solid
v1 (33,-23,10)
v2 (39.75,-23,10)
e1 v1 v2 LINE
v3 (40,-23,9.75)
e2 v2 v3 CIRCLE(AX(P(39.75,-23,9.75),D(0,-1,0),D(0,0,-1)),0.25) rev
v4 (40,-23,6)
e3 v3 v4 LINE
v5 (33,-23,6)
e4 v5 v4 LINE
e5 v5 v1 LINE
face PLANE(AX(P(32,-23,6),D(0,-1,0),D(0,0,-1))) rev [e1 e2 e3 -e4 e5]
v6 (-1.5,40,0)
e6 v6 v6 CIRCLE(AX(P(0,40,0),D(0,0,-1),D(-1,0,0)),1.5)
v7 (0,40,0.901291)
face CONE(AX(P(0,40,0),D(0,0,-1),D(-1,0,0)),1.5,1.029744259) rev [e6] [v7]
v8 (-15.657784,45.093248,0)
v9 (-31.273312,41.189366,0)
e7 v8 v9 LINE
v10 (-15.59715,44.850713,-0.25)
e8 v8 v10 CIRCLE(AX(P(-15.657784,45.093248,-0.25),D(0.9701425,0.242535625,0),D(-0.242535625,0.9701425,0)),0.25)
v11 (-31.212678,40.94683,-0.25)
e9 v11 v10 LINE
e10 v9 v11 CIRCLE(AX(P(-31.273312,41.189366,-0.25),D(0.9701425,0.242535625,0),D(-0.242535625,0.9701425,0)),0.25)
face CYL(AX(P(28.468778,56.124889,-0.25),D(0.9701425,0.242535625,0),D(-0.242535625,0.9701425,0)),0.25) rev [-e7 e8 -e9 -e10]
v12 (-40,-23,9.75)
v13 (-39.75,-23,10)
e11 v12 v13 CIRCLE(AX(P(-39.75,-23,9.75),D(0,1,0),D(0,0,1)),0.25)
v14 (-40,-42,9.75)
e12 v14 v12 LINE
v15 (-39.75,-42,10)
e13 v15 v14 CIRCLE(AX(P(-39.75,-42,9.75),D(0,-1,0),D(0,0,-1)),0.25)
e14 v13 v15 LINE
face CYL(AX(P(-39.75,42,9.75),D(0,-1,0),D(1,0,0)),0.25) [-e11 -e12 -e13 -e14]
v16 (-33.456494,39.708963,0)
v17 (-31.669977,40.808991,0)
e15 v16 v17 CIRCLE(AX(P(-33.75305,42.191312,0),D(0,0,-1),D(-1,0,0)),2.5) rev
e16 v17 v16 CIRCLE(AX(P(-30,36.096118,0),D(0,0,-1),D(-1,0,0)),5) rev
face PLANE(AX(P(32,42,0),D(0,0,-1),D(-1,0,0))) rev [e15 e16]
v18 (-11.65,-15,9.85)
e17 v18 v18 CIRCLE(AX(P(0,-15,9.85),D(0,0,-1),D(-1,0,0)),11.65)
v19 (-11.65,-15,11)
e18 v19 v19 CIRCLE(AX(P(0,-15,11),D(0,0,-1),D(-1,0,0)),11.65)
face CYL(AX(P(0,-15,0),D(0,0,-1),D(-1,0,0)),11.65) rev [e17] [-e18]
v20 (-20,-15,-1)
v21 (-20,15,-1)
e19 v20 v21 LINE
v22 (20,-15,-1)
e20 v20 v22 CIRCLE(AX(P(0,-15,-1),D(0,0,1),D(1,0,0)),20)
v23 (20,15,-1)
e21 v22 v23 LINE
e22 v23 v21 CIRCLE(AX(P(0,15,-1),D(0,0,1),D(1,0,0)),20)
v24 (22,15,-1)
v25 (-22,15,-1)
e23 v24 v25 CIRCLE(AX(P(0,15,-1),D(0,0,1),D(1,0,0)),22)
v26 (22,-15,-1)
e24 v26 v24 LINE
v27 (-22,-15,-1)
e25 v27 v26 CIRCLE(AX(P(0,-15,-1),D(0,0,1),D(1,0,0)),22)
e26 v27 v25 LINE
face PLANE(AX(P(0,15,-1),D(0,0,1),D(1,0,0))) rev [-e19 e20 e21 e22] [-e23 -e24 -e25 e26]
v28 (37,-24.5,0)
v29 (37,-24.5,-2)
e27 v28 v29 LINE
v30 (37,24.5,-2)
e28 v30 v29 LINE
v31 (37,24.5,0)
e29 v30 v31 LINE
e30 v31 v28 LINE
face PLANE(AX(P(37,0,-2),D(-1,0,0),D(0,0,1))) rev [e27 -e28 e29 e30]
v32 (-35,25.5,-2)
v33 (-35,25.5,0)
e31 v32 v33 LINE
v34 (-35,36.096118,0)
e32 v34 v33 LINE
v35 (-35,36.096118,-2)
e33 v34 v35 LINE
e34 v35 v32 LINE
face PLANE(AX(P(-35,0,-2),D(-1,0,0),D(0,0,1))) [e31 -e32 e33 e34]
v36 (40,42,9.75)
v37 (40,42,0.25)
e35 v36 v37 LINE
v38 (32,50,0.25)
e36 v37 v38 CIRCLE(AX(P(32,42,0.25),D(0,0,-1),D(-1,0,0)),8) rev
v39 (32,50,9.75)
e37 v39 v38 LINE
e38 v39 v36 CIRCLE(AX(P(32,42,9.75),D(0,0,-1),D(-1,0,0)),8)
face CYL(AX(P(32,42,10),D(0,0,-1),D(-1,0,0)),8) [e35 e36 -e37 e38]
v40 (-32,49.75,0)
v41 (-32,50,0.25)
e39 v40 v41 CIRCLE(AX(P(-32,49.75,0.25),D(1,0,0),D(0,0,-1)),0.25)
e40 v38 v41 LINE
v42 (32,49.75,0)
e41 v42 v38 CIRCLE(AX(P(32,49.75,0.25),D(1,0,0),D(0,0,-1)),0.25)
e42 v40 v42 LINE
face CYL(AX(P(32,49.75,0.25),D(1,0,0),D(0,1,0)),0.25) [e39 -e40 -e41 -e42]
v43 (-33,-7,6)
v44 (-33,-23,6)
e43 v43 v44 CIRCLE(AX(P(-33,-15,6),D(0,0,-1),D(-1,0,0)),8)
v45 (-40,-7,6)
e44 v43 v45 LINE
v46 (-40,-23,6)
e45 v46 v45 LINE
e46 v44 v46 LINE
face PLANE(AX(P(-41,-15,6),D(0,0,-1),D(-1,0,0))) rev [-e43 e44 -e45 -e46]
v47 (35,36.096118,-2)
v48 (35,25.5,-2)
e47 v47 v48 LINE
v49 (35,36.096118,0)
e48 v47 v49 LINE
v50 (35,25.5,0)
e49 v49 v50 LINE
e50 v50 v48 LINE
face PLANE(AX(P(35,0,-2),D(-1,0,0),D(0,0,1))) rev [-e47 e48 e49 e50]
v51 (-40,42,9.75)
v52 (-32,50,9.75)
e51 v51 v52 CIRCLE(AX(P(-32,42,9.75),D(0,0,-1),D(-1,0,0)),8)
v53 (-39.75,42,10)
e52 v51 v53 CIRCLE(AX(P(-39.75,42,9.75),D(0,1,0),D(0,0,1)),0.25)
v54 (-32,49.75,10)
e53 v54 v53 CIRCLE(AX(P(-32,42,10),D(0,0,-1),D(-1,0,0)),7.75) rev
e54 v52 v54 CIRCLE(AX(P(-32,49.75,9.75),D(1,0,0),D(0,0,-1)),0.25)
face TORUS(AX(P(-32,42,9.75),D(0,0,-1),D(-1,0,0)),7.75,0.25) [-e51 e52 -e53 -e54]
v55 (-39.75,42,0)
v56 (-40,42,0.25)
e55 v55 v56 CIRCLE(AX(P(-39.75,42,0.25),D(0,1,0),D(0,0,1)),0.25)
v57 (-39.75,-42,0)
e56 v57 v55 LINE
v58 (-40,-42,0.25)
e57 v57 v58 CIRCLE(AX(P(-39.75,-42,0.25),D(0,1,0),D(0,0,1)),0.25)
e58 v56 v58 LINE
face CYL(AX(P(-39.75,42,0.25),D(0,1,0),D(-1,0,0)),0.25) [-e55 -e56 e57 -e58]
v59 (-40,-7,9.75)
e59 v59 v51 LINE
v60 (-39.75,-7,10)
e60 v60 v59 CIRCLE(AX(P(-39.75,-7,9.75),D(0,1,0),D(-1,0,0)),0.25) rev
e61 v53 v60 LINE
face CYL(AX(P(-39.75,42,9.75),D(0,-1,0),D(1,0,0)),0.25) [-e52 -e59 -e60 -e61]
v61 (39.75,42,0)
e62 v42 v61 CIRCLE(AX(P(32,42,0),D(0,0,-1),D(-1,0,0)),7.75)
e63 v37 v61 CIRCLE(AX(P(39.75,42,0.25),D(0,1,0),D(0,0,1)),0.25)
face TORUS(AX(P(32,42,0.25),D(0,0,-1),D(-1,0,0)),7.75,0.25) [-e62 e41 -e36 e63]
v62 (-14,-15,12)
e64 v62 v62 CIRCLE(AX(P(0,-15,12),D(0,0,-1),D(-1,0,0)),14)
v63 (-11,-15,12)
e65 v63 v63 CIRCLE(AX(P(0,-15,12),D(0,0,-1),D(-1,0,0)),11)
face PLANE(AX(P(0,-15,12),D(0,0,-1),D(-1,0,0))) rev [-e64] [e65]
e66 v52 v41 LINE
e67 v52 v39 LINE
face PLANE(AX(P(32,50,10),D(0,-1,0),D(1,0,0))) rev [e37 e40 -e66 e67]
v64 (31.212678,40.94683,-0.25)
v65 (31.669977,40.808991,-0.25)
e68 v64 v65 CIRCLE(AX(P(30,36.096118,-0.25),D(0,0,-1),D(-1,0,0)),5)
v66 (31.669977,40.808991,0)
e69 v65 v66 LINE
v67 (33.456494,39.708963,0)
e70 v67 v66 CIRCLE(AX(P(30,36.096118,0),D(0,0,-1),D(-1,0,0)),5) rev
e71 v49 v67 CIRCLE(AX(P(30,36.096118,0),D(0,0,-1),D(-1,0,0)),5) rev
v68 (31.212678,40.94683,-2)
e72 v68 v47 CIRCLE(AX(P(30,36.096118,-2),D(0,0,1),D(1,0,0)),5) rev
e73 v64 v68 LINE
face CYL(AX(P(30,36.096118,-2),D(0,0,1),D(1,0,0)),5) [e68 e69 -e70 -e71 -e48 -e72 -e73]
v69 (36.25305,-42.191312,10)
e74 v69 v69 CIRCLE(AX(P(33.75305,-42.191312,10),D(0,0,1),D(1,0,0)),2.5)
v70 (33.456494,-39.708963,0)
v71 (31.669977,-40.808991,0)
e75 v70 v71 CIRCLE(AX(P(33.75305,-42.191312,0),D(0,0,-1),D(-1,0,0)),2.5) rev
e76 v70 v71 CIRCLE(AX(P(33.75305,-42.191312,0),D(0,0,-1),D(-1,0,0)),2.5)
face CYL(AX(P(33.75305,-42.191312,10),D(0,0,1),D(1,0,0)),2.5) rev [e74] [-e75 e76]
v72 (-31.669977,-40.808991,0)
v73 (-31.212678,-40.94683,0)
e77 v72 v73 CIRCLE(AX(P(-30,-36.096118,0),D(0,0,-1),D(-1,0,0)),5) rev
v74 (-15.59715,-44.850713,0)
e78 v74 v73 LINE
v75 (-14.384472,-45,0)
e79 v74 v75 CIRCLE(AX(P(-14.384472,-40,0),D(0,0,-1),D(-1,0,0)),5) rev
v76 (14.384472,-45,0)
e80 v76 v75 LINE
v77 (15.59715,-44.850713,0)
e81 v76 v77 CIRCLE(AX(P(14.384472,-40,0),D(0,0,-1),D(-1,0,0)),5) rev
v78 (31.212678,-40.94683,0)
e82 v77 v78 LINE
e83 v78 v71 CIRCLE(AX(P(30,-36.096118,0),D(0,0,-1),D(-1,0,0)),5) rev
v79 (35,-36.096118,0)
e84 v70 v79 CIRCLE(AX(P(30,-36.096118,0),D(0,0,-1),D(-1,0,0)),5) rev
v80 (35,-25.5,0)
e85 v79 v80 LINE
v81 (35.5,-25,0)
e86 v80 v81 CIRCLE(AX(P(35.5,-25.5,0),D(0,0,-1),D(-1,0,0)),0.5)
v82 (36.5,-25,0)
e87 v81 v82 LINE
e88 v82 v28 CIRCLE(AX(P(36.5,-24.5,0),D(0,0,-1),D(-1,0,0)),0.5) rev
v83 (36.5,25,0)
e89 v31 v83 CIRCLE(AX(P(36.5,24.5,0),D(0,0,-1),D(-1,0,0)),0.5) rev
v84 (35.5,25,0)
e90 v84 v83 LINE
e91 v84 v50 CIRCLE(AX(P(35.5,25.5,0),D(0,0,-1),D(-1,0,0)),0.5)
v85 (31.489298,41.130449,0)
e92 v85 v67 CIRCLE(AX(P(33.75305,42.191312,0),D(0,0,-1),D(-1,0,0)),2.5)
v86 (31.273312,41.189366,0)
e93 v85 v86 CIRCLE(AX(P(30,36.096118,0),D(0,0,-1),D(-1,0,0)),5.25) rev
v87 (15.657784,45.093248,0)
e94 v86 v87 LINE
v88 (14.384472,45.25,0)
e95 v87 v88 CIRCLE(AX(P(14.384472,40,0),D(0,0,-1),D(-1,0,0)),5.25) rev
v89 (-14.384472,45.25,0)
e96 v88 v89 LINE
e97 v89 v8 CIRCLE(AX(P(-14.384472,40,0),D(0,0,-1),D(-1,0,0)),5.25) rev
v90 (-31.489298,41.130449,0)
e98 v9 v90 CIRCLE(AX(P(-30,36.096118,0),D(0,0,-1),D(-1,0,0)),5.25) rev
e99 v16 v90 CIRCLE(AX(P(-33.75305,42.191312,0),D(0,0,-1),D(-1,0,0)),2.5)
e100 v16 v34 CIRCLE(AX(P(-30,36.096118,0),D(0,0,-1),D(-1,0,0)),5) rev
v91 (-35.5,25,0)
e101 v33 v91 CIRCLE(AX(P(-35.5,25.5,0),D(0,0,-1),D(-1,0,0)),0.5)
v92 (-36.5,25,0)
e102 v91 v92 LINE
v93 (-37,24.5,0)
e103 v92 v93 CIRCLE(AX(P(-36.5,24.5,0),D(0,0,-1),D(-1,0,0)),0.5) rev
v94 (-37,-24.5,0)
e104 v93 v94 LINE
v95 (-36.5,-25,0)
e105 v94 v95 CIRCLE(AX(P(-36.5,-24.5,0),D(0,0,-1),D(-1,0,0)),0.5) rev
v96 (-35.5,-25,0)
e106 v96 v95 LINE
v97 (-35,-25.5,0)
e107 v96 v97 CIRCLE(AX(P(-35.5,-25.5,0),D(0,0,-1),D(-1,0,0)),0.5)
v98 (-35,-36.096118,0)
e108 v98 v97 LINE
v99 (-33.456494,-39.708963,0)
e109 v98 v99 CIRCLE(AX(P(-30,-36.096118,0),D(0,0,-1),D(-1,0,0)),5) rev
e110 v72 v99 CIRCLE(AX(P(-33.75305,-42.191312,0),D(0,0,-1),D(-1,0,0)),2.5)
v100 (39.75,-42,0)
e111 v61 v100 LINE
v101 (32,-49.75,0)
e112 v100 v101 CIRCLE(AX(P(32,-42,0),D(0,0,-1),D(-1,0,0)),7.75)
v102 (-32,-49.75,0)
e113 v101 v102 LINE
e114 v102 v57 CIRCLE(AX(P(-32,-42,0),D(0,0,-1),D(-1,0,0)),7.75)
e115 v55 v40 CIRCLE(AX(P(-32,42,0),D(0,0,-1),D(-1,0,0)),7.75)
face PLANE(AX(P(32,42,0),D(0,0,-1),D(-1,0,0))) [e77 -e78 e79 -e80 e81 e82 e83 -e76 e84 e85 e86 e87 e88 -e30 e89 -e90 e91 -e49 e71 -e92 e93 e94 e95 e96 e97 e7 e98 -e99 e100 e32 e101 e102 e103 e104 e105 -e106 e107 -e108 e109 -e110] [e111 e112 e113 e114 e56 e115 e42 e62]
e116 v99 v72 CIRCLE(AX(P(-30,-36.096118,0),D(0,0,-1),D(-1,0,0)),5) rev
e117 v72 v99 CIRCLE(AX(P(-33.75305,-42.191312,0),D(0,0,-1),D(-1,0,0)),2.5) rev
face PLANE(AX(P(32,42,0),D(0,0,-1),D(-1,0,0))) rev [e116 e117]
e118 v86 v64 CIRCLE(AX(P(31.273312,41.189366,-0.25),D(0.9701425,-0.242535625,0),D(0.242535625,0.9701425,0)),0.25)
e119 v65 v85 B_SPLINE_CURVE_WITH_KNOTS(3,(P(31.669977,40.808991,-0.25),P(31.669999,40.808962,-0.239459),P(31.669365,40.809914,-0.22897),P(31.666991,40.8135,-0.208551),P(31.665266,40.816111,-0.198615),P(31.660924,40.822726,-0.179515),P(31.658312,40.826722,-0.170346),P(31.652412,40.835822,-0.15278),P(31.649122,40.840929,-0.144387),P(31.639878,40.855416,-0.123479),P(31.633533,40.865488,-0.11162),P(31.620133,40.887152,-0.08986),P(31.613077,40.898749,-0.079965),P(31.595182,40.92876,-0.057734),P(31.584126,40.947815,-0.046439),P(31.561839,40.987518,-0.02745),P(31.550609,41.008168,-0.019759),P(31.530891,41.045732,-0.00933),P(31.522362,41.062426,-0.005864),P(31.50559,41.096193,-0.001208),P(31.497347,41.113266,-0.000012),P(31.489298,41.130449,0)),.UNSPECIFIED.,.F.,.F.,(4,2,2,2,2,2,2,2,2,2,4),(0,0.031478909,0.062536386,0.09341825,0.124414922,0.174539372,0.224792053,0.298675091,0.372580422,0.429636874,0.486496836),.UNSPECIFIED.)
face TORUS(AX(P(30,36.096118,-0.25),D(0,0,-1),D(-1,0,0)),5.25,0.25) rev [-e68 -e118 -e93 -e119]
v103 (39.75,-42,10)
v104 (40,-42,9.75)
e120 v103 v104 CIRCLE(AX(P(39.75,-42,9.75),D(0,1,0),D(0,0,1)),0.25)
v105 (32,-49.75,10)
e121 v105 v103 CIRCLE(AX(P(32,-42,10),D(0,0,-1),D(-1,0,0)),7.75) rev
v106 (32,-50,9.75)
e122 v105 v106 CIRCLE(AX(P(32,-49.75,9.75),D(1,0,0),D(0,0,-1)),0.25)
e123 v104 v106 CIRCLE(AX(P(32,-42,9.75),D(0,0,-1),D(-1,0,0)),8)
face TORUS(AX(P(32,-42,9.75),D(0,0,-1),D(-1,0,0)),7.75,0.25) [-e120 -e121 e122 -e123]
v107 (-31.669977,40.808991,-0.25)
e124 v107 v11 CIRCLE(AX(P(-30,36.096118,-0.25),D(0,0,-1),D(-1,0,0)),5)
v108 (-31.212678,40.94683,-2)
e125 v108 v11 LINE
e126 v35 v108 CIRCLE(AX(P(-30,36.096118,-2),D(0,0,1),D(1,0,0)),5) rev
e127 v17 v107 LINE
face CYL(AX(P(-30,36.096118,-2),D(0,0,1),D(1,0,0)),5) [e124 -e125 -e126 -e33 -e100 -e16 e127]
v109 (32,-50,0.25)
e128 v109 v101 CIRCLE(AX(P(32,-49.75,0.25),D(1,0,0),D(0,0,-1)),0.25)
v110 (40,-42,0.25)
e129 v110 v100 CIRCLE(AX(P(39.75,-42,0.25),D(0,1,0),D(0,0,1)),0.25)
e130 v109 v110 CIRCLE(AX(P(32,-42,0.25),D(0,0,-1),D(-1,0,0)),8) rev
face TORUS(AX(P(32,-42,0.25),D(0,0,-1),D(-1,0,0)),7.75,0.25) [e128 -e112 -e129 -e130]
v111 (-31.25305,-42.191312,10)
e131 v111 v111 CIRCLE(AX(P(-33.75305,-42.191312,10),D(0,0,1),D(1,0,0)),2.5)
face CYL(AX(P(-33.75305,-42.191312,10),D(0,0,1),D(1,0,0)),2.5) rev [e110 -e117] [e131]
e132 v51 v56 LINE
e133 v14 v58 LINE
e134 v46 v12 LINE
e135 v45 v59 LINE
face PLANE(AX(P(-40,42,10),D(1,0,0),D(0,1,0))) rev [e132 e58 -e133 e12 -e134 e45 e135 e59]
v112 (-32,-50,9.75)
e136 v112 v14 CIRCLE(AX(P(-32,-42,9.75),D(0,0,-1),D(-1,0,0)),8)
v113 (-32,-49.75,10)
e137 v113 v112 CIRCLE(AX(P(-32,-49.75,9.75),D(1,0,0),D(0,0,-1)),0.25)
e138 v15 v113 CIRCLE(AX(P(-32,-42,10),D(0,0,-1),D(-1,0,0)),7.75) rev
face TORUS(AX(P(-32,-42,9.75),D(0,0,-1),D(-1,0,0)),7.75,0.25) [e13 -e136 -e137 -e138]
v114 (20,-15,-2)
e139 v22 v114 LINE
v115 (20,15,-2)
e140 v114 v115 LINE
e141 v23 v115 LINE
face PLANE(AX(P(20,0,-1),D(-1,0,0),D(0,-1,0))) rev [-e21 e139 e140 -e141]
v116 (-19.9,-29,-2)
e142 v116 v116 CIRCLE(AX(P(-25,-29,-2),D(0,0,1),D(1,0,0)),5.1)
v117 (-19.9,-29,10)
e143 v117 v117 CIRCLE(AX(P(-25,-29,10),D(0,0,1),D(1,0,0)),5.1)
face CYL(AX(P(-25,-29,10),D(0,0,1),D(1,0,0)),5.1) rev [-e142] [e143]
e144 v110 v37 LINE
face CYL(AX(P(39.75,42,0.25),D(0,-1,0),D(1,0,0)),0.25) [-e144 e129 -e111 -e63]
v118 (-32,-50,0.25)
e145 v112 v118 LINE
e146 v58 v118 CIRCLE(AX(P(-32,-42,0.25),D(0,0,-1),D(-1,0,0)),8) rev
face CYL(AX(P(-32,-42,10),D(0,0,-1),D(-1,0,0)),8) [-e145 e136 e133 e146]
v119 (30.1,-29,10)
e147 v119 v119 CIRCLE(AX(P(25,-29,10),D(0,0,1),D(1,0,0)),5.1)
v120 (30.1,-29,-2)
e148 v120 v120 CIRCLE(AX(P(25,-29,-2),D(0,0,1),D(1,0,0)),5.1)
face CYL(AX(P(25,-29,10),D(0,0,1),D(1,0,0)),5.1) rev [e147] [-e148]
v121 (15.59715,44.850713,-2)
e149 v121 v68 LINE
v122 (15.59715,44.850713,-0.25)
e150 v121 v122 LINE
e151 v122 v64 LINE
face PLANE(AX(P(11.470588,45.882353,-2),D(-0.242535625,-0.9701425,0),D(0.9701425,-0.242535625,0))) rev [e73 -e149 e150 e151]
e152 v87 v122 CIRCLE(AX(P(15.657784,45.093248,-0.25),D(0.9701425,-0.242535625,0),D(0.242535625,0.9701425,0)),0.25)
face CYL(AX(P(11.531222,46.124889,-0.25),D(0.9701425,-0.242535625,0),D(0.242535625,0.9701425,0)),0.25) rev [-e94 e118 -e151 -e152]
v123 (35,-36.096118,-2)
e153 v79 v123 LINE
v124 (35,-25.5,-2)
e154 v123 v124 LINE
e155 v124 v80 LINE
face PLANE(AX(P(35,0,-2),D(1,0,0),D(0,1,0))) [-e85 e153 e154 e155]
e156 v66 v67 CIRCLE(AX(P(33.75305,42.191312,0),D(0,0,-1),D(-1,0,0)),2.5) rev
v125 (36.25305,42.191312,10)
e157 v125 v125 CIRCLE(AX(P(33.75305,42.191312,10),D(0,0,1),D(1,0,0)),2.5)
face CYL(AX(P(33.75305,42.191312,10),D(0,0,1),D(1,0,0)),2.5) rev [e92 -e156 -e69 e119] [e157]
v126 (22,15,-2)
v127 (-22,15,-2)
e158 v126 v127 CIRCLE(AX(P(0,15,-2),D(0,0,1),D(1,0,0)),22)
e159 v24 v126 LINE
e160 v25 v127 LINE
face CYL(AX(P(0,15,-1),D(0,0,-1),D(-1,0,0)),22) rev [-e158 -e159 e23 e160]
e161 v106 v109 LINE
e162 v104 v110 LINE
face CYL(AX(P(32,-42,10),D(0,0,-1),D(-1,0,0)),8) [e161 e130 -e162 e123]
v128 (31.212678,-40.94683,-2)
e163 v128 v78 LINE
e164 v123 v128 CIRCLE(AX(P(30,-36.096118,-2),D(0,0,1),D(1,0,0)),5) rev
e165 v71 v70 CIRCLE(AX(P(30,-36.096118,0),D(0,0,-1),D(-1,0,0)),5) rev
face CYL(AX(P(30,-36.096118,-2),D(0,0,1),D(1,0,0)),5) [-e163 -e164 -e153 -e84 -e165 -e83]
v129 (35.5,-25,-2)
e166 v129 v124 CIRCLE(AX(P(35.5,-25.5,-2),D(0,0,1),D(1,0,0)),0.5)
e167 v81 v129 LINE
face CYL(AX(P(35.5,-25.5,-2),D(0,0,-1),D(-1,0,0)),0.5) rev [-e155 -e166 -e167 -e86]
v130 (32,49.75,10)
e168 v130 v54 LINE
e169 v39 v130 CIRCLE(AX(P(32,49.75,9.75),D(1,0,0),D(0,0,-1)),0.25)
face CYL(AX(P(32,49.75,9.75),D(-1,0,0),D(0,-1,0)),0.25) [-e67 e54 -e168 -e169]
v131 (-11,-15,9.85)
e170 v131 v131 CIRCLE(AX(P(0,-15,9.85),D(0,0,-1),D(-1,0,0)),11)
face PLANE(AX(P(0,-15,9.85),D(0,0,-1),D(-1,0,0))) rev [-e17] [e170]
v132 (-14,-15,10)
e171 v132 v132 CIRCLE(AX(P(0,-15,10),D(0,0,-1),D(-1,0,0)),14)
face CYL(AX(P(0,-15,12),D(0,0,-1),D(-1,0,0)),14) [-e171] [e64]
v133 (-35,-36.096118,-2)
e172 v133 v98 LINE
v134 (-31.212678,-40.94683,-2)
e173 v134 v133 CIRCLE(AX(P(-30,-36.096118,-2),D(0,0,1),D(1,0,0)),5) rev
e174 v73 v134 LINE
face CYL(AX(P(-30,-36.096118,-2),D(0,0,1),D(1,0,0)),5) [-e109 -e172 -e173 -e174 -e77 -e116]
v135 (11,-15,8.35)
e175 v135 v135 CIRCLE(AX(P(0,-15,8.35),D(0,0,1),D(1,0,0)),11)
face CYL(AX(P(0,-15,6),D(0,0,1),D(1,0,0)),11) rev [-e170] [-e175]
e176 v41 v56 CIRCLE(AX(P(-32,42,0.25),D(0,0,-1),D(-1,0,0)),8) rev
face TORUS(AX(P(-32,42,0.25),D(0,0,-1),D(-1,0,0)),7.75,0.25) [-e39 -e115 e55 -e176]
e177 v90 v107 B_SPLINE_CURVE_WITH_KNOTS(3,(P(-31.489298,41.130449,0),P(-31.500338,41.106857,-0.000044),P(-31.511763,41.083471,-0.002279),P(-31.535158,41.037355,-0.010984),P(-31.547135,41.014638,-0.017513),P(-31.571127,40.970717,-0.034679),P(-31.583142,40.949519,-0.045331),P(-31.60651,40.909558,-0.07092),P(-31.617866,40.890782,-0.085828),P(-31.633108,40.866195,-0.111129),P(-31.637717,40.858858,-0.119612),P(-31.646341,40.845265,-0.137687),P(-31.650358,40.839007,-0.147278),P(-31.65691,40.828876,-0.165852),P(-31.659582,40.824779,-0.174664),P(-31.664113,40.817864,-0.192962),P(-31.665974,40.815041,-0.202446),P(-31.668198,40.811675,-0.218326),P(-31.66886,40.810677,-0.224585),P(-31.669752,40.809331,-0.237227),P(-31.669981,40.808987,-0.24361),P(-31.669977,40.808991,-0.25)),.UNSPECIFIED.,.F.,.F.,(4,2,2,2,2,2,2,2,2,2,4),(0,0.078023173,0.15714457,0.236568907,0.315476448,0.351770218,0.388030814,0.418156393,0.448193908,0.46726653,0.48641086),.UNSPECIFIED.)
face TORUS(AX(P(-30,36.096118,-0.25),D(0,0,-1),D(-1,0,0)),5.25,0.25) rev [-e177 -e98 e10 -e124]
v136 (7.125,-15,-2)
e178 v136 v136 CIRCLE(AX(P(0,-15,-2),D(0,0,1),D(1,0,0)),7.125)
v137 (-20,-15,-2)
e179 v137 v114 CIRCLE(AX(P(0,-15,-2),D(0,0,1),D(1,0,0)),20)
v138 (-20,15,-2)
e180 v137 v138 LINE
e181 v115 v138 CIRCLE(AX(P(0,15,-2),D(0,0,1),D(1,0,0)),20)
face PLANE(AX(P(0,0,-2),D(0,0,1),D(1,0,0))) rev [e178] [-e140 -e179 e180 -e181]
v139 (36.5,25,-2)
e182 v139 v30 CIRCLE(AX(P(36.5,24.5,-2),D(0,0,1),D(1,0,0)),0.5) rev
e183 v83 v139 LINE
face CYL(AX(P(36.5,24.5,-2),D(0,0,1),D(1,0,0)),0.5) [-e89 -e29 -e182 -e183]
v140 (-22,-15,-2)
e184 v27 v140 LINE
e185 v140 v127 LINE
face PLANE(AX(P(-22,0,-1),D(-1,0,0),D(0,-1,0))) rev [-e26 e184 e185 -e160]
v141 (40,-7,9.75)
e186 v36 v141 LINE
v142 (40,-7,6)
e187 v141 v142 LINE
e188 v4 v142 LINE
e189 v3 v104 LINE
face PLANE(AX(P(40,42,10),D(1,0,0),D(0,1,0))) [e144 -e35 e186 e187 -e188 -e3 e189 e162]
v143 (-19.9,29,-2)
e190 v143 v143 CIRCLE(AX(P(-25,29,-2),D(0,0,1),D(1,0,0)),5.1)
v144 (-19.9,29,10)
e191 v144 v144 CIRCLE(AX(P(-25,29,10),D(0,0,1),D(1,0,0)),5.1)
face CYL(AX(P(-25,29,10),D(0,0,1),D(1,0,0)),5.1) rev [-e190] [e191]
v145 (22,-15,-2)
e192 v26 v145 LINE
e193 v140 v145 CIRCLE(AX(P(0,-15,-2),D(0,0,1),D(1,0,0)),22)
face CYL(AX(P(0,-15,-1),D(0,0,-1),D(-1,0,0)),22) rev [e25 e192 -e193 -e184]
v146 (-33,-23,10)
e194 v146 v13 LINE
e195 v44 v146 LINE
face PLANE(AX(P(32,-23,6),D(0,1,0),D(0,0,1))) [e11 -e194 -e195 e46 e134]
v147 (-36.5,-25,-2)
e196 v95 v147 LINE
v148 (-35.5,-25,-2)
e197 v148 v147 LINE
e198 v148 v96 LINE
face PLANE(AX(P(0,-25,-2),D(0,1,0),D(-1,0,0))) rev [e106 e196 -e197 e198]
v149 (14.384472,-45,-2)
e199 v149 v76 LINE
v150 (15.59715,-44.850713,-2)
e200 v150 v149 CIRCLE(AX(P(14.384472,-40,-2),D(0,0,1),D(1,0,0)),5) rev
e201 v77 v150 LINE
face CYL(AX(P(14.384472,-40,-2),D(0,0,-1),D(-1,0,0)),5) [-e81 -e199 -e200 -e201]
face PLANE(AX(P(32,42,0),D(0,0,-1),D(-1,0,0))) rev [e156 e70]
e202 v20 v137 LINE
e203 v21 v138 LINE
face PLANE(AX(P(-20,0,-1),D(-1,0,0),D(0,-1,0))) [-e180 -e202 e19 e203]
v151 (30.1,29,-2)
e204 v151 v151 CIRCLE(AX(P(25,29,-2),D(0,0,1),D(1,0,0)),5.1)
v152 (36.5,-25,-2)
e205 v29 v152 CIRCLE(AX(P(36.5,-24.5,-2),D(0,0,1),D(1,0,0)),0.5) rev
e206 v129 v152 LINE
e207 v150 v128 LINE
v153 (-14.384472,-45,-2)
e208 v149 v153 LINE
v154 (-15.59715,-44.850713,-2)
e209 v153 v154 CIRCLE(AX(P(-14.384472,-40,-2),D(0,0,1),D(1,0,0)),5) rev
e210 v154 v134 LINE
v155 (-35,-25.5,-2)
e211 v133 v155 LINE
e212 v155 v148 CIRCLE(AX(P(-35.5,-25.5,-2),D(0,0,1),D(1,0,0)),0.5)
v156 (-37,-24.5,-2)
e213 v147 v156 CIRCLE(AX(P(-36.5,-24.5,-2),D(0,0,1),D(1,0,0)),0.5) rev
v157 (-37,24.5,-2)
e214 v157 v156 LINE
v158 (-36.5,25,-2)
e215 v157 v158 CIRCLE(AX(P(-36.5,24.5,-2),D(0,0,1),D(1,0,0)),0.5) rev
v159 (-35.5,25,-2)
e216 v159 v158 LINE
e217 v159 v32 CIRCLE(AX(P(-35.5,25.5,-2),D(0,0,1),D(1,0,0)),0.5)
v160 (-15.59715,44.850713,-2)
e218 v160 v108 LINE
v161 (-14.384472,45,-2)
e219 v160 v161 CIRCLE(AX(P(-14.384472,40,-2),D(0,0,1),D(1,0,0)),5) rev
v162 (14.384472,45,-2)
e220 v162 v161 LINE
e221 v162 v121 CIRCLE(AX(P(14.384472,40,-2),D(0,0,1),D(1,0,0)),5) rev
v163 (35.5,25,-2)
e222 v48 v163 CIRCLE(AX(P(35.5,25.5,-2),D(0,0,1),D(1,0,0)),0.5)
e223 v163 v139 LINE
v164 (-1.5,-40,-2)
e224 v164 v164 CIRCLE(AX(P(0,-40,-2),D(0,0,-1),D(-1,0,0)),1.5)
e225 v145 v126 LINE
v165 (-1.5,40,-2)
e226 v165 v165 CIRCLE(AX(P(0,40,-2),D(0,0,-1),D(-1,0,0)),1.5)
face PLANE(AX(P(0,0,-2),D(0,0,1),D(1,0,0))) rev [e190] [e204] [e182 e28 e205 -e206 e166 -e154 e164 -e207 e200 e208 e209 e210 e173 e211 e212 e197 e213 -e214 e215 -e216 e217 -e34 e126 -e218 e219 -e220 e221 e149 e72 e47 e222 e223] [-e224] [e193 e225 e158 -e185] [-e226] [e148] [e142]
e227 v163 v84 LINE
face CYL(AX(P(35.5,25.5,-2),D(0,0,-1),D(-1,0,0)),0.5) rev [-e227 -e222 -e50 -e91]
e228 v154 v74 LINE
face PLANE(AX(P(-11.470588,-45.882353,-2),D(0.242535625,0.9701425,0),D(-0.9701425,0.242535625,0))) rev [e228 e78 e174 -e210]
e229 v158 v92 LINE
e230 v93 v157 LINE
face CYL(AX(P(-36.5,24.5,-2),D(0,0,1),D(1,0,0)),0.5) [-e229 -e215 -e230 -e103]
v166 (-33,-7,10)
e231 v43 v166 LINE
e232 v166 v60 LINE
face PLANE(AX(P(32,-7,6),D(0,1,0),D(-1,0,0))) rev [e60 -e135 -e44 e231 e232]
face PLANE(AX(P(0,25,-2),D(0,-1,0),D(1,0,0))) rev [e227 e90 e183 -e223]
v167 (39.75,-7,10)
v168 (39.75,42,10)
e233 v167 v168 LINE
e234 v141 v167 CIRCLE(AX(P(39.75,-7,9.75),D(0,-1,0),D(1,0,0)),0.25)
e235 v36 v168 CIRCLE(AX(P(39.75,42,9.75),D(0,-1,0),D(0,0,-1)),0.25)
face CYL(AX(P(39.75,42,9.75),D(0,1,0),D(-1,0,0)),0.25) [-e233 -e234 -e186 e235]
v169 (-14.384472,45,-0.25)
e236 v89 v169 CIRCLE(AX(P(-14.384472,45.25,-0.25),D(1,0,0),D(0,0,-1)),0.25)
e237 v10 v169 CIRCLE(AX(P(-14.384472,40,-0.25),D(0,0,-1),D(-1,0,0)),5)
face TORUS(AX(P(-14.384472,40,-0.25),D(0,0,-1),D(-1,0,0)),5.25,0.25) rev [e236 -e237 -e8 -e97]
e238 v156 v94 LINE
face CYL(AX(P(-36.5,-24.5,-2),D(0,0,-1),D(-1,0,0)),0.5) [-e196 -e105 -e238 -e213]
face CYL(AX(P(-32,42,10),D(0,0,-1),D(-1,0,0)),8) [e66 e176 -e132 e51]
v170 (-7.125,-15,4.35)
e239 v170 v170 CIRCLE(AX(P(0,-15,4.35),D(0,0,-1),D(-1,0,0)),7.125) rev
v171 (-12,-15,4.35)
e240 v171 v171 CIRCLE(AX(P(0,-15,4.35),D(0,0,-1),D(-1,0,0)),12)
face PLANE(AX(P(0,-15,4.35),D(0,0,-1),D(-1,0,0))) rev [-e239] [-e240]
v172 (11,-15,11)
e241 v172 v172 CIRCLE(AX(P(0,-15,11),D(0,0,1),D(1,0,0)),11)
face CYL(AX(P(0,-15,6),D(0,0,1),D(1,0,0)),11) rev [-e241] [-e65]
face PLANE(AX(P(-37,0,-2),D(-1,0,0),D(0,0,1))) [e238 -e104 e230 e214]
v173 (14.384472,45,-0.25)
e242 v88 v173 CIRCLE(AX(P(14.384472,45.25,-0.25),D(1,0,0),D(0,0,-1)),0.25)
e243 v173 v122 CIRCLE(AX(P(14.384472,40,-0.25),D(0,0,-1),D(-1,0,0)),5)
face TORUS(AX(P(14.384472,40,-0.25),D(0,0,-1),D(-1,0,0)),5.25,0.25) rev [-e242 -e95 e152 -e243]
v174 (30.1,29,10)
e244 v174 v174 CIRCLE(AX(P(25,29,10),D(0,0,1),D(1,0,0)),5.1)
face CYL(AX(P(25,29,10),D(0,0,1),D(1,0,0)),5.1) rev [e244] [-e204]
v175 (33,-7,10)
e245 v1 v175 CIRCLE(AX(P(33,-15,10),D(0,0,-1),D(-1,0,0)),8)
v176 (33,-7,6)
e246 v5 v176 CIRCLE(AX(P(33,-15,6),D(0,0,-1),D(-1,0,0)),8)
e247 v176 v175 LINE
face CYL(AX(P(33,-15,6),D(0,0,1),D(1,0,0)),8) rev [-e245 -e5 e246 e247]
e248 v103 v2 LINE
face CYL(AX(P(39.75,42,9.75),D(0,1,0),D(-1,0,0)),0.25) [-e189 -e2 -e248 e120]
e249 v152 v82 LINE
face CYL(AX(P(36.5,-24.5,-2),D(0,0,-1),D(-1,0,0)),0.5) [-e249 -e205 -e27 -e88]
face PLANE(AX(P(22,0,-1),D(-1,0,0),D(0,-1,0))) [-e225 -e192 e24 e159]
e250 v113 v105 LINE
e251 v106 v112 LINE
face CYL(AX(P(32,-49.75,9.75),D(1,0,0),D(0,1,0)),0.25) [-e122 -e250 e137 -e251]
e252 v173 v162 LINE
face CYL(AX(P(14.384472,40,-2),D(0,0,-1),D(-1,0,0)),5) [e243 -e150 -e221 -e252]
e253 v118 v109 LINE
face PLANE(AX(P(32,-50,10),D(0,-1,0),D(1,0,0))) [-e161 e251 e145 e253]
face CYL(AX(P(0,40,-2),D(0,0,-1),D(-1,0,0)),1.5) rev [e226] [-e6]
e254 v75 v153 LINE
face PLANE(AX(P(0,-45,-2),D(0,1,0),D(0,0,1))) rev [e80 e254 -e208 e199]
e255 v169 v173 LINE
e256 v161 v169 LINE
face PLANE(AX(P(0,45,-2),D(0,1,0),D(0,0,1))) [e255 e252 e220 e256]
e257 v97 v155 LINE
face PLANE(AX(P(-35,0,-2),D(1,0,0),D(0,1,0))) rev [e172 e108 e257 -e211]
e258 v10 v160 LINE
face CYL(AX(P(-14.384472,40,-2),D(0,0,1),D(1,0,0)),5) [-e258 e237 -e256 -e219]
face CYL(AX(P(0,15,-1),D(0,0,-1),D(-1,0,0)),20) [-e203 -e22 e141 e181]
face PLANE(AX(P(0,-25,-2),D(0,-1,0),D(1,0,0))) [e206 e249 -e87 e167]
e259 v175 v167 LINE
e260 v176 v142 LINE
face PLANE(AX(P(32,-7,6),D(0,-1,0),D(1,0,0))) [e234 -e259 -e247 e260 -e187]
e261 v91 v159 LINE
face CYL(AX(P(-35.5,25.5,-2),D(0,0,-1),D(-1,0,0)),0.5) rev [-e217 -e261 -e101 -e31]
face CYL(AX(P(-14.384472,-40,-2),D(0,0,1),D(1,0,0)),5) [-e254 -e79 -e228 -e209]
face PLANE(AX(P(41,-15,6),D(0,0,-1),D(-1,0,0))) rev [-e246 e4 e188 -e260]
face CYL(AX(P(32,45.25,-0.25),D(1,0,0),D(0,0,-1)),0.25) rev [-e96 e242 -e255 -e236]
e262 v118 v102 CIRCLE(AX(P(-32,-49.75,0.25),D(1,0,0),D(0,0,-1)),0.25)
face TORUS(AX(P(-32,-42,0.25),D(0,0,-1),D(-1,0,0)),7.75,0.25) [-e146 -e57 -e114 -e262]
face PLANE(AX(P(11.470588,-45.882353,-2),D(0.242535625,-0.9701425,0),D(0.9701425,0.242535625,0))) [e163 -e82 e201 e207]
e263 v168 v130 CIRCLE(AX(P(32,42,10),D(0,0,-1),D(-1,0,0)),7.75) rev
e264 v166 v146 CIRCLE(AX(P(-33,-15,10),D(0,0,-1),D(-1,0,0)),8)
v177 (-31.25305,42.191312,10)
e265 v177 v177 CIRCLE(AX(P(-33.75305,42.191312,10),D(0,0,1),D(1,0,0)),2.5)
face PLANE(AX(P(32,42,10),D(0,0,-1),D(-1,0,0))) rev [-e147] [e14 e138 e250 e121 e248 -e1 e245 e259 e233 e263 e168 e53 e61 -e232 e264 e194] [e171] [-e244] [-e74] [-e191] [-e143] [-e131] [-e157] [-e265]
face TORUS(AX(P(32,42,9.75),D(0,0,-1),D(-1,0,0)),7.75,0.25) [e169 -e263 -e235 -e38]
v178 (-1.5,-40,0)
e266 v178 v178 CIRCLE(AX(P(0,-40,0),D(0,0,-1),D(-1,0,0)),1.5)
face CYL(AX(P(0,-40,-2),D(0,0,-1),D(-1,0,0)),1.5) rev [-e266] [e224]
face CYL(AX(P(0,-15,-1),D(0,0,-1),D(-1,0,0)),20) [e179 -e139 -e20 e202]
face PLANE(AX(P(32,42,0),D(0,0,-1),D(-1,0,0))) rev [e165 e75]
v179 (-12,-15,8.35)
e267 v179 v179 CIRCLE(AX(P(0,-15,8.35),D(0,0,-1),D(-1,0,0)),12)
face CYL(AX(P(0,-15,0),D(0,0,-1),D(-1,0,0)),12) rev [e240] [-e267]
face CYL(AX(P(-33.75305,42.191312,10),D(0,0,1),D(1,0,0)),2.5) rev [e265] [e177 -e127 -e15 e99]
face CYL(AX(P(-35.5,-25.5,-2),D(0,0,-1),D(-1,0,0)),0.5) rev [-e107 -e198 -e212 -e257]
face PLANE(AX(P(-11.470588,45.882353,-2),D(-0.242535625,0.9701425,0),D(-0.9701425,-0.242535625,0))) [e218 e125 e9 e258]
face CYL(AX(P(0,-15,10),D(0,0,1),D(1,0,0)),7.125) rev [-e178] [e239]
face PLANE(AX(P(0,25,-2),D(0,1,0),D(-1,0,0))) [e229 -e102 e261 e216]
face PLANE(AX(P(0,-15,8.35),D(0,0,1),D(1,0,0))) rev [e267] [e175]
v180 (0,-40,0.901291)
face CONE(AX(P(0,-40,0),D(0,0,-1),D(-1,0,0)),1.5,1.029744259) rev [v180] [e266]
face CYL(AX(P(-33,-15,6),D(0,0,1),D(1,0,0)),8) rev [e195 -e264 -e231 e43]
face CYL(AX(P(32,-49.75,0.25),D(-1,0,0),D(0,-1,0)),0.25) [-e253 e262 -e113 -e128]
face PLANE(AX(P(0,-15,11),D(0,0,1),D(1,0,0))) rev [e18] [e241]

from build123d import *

# Parameters (mm, degrees)
BOSS_EXTRUDE1_DEPTH            = 2
BOSS_EXTRUDE2_DEPTH            = 10
CUT_EXTRUDE1_START             = 10
CUT_EXTRUDE1_DEPTH             = 4
CUT_EXTRUDE2_START             = 10
SKETCH1_5_R                    = 11
CUT_EXTRUDE2_DEPTH             = 4
F_14_25_14_25_DIAMETER_HOLE1_D = 14.25
F_5_0_5_DIAMETER_HOLE1_D       = 5
F_5_0_5_DIAMETER_HOLE1_DEPTH   = 10
F_10_2_10_2_DIAMETER_HOLE1_D   = 10.2
EXTRUDE_THIN1_START            = 12
SKETCH1_6_R                    = 14
SKETCH1_6_R_2                  = 11
EXTRUDE_THIN1_DEPTH            = 2
SKETCH8_W                      = 1.15
SKETCH8_H                      = 11.65
SKETCH8_W_2                    = 4
SKETCH8_H_2                    = 12
FILLET1_R                      = 0.5
FILLET2_R                      = 5
FILLET3_R                      = 0.25
CUT_EXTRUDE_THIN1_START        = -2
CUT_EXTRUDE_THIN1_DEPTH        = 1
F_3_0_3_DIAMETER_HOLE1_D       = 3
F_3_0_3_DIAMETER_HOLE1_DEPTH   = 2
F_3_0_3_DIAMETER_HOLE1_TIP     = 0.901290929


with BuildPart() as part:
    # Sketch1 → Boss-Extrude1 (new body)
    with BuildSketch(Plane.XY):
        Polygon((15, 45), (-15, 45), (-35, 40), (-35, 25), (-37, 25), (-37, -25), (-35, -25), (-35, -40), (-15, -45), (15, -45), (35, -40), (35, -25), (37, -25), (37, 25), (35, 25), (35, 40), align=None)
    extrude(amount=-BOSS_EXTRUDE1_DEPTH)

    # Sketch1<3> → Boss-Extrude2 (add)
    with BuildSketch(Plane.XY):
        with BuildLine():
            Line((32, 50), (-32, 50))
            ThreePointArc((-32, 50), (-37.656854249, 47.656854249), (-40, 42))
            Line((-40, 42), (-40, -42))
            ThreePointArc((-40, -42), (-37.656854249, -47.656854249), (-32, -50))
            Line((-32, -50), (32, -50))
            ThreePointArc((32, -50), (37.656854249, -47.656854249), (40, -42))
            Line((40, -42), (40, 42))
            ThreePointArc((40, 42), (37.656854249, 47.656854249), (32, 50))
        make_face()
    extrude(amount=BOSS_EXTRUDE2_DEPTH)

    # Sketch1<4> → Cut-Extrude1 (cut)
    with BuildSketch(Plane.XY.offset(CUT_EXTRUDE1_START)):
        with BuildLine():
            Line((33, -7), (41, -7))
            ThreePointArc((41, -7), (49, -15), (41, -23))
            Line((41, -23), (33, -23))
            ThreePointArc((33, -23), (25, -15), (33, -7))
        make_face()
        with BuildLine():
            Line((-33, -7), (-41, -7))
            ThreePointArc((-41, -7), (-49, -15), (-41, -23))
            Line((-41, -23), (-33, -23))
            ThreePointArc((-33, -23), (-25, -15), (-33, -7))
        make_face()
    extrude(amount=-CUT_EXTRUDE1_DEPTH, mode=Mode.SUBTRACT)

    # Sketch1<5> → Cut-Extrude2 (cut)
    with BuildSketch(Plane.XY.offset(CUT_EXTRUDE2_START)):
        with Locations(Location((0, -15, 0), (0, 0, 180))):
            Circle(SKETCH1_5_R)
    extrude(amount=-CUT_EXTRUDE2_DEPTH, mode=Mode.SUBTRACT)

    # Ø14.25 (14.25) Diameter Hole1 (through all)
    with Locations(Plane.XY.offset(10)):
        with Locations((0, -15)):
            Hole(F_14_25_14_25_DIAMETER_HOLE1_D / 2)

    # Ø5.0 (5) Diameter Hole1
    with Locations(Plane.XY.offset(10)):
        with Locations((-33.753049524, 42.191311906), (33.753049524, 42.191311906), (33.753049524, -42.191311906), (-33.753049524, -42.191311906)):
            Hole(F_5_0_5_DIAMETER_HOLE1_D / 2, depth=F_5_0_5_DIAMETER_HOLE1_DEPTH)

    # Ø10.2 (10.2) Diameter Hole1 (through all)
    with Locations(Plane.XY.offset(10)):
        with Locations((-25, 29), (25, 29), (25, -29), (-25, -29)):
            Hole(F_10_2_10_2_DIAMETER_HOLE1_D / 2)

    # Sketch1<6> → Extrude-Thin1 (add)
    with BuildSketch(Plane.XY.offset(EXTRUDE_THIN1_START)):
        with Locations((0, -15)):
            Circle(SKETCH1_6_R)
        with Locations((0, -15)):
            Circle(SKETCH1_6_R_2, mode=Mode.SUBTRACT)
    extrude(amount=-EXTRUDE_THIN1_DEPTH)

    # Sketch8 → Cut-Revolve1 (revolve, cut)
    with BuildSketch(Plane(origin=(0, 0, 0), x_dir=(0, 0, -1), z_dir=(1, 0, 0)), mode=Mode.PRIVATE) as cut_revolve1_sk:
        with Locations((-10.425, -9.175)):
            Rectangle(SKETCH8_W, SKETCH8_H)
        with Locations((-6.35, -9)):
            Rectangle(SKETCH8_W_2, SKETCH8_H_2)
    revolve(cut_revolve1_sk.sketch.rotate(Axis((0, -15, 0), (0, 0, 1)), 270), axis=Axis((0, -15, 0), (0, 0, 1)), mode=Mode.SUBTRACT)

    # Fillet1
    fillet1_edges = [part.edges().sort_by_distance(p)[0] for p in [
        (-35, 25, -1),
        (35, 25, -1),
        (37, 25, -1),
        (37, -25, -1),
        (35, -25, -1),
        (-35, -25, -1),
        (-37, -25, -1),
        (-37, 25, -1),
    ]]
    fillet(fillet1_edges, radius=FILLET1_R)

    # Fillet2
    # the kernel refuses this fillet: 5 mm, written as the material it takes off along each edge
    with BuildSketch(Plane(origin=(-35, 40, 0), x_dir=(0.970142500145332, 0.24253562503633277, 0), z_dir=(0, 0, -1)), Plane(origin=(35, 40, 0), x_dir=(0, -1, 0), z_dir=(0, 0, -1))) as fillet2_piece_1:
        with BuildLine():
            CenterArc((FILLET2_R * 0.780776406404, FILLET2_R), FILLET2_R, 194.036243468, 75.963756532)
            Line((-FILLET2_R * 0.189366093741, FILLET2_R * 0.757464374964), (0, 0))
            Line((0, 0), (FILLET2_R * 0.780776406404, 0))
        make_face()
    extrude(amount=11.75970508, mode=Mode.SUBTRACT)
    with BuildSketch(Plane(origin=(-15, 45, 0), x_dir=(1, 0, 0), z_dir=(0, 0, -1)), Plane(origin=(15, 45, 0), x_dir=(0.9701425001453312, -0.2425356250363357, 0), z_dir=(0, 0, -1))) as fillet2_piece_2:
        with BuildLine():
            CenterArc((FILLET2_R * 0.123105625618, FILLET2_R), FILLET2_R, 255.963756532, 14.036243468)
            Line((-FILLET2_R * 0.119429999419, FILLET2_R * 0.0298574998547), (0, 0))
            Line((0, 0), (FILLET2_R * 0.123105625618, 0))
        make_face()
    extrude(amount=3.53882032, mode=Mode.SUBTRACT)
    with BuildSketch(Plane(origin=(35, -40, 0), x_dir=(0, 1, 0), z_dir=(0, 0, -1)), Plane(origin=(-35, -40, 0), x_dir=(0.9701425001453319, -0.24253562503633297, 0), z_dir=(0, 0, -1))) as fillet2_piece_3:
        with BuildLine():
            CenterArc((FILLET2_R * 0.780776406404, -FILLET2_R), FILLET2_R, 90, 75.963756532)
            Line((-FILLET2_R * 0.189366093741, -FILLET2_R * 0.757464374964), (0, 0))
            Line((0, 0), (FILLET2_R * 0.780776406404, 0))
        make_face()
    extrude(amount=11.75970508, mode=Mode.SUBTRACT)
    with BuildSketch(Plane(origin=(15, -45, 0), x_dir=(0.9701425001453312, 0.2425356250363357, 0), z_dir=(0, 0, -1)), Plane(origin=(-15, -45, 0), x_dir=(1, 0, 0), z_dir=(0, 0, -1))) as fillet2_piece_4:
        with BuildLine():
            CenterArc((FILLET2_R * 0.123105625618, -FILLET2_R), FILLET2_R, 90, 14.036243468)
            Line((-FILLET2_R * 0.119429999419, -FILLET2_R * 0.0298574998547), (0, 0))
            Line((0, 0), (FILLET2_R * 0.123105625618, 0))
        make_face()
    extrude(amount=3.53882032, mode=Mode.SUBTRACT)

    # Fillet3
    fillet3_edges = [part.edges().sort_by_distance(p)[0] for p in [
        (23.404914061, 42.898771485, 0),
        (0, 45, 0),
        (-23.404914061, 42.898771485, 0),
        (31.442974512, 40.883374443, 0),
        (14.99538819, 44.962537783, 0),
        (-14.99538819, 44.962537783, 0),
        (-31.442974512, 40.883374443, 0),
        (37.656854249, 47.656854249, 10),
        (0, 50, 0),
        (-37.656854249, 47.656854249, 0),
        (-40, 0, 0),
        (-37.656854249, -47.656854249, 10),
        (0, -50, 10),
        (37.656854249, -47.656854249, 10),
        (40, 17.5, 10),
        (0, 50, 10),
        (-37.656854249, 47.656854249, 10),
        (-40, 17.5, 10),
        (37.656854249, 47.656854249, 0),
        (40, 0, 0),
        (37.656854249, -47.656854249, 0),
        (0, -50, 0),
        (-37.656854249, -47.656854249, 0),
        (-40, -32.5, 10),
        (40, -32.5, 10),
    ]]
    fillet(fillet3_edges, radius=FILLET3_R)

    # Sketch1<8> → Cut-Extrude-Thin1 (cut)
    with BuildSketch(Plane.XY.offset(CUT_EXTRUDE_THIN1_START)):
        with BuildLine():
            Line((22, 15), (22, -15))
            ThreePointArc((22, -15), (0, -37), (-22, -15))
            Line((-22, -15), (-22, 15))
            ThreePointArc((-22, 15), (0, 37), (22, 15))
        make_face()
        with BuildLine():
            Line((20, 15), (20, -15))
            ThreePointArc((20, -15), (0, -35), (-20, -15))
            Line((-20, -15), (-20, 15))
            ThreePointArc((-20, 15), (0, 35), (20, 15))
        make_face(mode=Mode.SUBTRACT)
    extrude(amount=CUT_EXTRUDE_THIN1_DEPTH, mode=Mode.SUBTRACT)

    # Ø3.0 (3) Diameter Hole1
    with Locations(Plane(origin=(0, 0, -2), x_dir=(-1, 0, 0), z_dir=(0, 0, -1))):
        with Locations((0, 40), (0, -40)):
            Hole(F_3_0_3_DIAMETER_HOLE1_D / 2, depth=F_3_0_3_DIAMETER_HOLE1_DEPTH)
            with Locations((0, 0, -(F_3_0_3_DIAMETER_HOLE1_DEPTH + F_3_0_3_DIAMETER_HOLE1_TIP / 2))):  # 118° drill point
                Cone(0, F_3_0_3_DIAMETER_HOLE1_D / 2, F_3_0_3_DIAMETER_HOLE1_TIP, mode=Mode.SUBTRACT)


solid = part.part
